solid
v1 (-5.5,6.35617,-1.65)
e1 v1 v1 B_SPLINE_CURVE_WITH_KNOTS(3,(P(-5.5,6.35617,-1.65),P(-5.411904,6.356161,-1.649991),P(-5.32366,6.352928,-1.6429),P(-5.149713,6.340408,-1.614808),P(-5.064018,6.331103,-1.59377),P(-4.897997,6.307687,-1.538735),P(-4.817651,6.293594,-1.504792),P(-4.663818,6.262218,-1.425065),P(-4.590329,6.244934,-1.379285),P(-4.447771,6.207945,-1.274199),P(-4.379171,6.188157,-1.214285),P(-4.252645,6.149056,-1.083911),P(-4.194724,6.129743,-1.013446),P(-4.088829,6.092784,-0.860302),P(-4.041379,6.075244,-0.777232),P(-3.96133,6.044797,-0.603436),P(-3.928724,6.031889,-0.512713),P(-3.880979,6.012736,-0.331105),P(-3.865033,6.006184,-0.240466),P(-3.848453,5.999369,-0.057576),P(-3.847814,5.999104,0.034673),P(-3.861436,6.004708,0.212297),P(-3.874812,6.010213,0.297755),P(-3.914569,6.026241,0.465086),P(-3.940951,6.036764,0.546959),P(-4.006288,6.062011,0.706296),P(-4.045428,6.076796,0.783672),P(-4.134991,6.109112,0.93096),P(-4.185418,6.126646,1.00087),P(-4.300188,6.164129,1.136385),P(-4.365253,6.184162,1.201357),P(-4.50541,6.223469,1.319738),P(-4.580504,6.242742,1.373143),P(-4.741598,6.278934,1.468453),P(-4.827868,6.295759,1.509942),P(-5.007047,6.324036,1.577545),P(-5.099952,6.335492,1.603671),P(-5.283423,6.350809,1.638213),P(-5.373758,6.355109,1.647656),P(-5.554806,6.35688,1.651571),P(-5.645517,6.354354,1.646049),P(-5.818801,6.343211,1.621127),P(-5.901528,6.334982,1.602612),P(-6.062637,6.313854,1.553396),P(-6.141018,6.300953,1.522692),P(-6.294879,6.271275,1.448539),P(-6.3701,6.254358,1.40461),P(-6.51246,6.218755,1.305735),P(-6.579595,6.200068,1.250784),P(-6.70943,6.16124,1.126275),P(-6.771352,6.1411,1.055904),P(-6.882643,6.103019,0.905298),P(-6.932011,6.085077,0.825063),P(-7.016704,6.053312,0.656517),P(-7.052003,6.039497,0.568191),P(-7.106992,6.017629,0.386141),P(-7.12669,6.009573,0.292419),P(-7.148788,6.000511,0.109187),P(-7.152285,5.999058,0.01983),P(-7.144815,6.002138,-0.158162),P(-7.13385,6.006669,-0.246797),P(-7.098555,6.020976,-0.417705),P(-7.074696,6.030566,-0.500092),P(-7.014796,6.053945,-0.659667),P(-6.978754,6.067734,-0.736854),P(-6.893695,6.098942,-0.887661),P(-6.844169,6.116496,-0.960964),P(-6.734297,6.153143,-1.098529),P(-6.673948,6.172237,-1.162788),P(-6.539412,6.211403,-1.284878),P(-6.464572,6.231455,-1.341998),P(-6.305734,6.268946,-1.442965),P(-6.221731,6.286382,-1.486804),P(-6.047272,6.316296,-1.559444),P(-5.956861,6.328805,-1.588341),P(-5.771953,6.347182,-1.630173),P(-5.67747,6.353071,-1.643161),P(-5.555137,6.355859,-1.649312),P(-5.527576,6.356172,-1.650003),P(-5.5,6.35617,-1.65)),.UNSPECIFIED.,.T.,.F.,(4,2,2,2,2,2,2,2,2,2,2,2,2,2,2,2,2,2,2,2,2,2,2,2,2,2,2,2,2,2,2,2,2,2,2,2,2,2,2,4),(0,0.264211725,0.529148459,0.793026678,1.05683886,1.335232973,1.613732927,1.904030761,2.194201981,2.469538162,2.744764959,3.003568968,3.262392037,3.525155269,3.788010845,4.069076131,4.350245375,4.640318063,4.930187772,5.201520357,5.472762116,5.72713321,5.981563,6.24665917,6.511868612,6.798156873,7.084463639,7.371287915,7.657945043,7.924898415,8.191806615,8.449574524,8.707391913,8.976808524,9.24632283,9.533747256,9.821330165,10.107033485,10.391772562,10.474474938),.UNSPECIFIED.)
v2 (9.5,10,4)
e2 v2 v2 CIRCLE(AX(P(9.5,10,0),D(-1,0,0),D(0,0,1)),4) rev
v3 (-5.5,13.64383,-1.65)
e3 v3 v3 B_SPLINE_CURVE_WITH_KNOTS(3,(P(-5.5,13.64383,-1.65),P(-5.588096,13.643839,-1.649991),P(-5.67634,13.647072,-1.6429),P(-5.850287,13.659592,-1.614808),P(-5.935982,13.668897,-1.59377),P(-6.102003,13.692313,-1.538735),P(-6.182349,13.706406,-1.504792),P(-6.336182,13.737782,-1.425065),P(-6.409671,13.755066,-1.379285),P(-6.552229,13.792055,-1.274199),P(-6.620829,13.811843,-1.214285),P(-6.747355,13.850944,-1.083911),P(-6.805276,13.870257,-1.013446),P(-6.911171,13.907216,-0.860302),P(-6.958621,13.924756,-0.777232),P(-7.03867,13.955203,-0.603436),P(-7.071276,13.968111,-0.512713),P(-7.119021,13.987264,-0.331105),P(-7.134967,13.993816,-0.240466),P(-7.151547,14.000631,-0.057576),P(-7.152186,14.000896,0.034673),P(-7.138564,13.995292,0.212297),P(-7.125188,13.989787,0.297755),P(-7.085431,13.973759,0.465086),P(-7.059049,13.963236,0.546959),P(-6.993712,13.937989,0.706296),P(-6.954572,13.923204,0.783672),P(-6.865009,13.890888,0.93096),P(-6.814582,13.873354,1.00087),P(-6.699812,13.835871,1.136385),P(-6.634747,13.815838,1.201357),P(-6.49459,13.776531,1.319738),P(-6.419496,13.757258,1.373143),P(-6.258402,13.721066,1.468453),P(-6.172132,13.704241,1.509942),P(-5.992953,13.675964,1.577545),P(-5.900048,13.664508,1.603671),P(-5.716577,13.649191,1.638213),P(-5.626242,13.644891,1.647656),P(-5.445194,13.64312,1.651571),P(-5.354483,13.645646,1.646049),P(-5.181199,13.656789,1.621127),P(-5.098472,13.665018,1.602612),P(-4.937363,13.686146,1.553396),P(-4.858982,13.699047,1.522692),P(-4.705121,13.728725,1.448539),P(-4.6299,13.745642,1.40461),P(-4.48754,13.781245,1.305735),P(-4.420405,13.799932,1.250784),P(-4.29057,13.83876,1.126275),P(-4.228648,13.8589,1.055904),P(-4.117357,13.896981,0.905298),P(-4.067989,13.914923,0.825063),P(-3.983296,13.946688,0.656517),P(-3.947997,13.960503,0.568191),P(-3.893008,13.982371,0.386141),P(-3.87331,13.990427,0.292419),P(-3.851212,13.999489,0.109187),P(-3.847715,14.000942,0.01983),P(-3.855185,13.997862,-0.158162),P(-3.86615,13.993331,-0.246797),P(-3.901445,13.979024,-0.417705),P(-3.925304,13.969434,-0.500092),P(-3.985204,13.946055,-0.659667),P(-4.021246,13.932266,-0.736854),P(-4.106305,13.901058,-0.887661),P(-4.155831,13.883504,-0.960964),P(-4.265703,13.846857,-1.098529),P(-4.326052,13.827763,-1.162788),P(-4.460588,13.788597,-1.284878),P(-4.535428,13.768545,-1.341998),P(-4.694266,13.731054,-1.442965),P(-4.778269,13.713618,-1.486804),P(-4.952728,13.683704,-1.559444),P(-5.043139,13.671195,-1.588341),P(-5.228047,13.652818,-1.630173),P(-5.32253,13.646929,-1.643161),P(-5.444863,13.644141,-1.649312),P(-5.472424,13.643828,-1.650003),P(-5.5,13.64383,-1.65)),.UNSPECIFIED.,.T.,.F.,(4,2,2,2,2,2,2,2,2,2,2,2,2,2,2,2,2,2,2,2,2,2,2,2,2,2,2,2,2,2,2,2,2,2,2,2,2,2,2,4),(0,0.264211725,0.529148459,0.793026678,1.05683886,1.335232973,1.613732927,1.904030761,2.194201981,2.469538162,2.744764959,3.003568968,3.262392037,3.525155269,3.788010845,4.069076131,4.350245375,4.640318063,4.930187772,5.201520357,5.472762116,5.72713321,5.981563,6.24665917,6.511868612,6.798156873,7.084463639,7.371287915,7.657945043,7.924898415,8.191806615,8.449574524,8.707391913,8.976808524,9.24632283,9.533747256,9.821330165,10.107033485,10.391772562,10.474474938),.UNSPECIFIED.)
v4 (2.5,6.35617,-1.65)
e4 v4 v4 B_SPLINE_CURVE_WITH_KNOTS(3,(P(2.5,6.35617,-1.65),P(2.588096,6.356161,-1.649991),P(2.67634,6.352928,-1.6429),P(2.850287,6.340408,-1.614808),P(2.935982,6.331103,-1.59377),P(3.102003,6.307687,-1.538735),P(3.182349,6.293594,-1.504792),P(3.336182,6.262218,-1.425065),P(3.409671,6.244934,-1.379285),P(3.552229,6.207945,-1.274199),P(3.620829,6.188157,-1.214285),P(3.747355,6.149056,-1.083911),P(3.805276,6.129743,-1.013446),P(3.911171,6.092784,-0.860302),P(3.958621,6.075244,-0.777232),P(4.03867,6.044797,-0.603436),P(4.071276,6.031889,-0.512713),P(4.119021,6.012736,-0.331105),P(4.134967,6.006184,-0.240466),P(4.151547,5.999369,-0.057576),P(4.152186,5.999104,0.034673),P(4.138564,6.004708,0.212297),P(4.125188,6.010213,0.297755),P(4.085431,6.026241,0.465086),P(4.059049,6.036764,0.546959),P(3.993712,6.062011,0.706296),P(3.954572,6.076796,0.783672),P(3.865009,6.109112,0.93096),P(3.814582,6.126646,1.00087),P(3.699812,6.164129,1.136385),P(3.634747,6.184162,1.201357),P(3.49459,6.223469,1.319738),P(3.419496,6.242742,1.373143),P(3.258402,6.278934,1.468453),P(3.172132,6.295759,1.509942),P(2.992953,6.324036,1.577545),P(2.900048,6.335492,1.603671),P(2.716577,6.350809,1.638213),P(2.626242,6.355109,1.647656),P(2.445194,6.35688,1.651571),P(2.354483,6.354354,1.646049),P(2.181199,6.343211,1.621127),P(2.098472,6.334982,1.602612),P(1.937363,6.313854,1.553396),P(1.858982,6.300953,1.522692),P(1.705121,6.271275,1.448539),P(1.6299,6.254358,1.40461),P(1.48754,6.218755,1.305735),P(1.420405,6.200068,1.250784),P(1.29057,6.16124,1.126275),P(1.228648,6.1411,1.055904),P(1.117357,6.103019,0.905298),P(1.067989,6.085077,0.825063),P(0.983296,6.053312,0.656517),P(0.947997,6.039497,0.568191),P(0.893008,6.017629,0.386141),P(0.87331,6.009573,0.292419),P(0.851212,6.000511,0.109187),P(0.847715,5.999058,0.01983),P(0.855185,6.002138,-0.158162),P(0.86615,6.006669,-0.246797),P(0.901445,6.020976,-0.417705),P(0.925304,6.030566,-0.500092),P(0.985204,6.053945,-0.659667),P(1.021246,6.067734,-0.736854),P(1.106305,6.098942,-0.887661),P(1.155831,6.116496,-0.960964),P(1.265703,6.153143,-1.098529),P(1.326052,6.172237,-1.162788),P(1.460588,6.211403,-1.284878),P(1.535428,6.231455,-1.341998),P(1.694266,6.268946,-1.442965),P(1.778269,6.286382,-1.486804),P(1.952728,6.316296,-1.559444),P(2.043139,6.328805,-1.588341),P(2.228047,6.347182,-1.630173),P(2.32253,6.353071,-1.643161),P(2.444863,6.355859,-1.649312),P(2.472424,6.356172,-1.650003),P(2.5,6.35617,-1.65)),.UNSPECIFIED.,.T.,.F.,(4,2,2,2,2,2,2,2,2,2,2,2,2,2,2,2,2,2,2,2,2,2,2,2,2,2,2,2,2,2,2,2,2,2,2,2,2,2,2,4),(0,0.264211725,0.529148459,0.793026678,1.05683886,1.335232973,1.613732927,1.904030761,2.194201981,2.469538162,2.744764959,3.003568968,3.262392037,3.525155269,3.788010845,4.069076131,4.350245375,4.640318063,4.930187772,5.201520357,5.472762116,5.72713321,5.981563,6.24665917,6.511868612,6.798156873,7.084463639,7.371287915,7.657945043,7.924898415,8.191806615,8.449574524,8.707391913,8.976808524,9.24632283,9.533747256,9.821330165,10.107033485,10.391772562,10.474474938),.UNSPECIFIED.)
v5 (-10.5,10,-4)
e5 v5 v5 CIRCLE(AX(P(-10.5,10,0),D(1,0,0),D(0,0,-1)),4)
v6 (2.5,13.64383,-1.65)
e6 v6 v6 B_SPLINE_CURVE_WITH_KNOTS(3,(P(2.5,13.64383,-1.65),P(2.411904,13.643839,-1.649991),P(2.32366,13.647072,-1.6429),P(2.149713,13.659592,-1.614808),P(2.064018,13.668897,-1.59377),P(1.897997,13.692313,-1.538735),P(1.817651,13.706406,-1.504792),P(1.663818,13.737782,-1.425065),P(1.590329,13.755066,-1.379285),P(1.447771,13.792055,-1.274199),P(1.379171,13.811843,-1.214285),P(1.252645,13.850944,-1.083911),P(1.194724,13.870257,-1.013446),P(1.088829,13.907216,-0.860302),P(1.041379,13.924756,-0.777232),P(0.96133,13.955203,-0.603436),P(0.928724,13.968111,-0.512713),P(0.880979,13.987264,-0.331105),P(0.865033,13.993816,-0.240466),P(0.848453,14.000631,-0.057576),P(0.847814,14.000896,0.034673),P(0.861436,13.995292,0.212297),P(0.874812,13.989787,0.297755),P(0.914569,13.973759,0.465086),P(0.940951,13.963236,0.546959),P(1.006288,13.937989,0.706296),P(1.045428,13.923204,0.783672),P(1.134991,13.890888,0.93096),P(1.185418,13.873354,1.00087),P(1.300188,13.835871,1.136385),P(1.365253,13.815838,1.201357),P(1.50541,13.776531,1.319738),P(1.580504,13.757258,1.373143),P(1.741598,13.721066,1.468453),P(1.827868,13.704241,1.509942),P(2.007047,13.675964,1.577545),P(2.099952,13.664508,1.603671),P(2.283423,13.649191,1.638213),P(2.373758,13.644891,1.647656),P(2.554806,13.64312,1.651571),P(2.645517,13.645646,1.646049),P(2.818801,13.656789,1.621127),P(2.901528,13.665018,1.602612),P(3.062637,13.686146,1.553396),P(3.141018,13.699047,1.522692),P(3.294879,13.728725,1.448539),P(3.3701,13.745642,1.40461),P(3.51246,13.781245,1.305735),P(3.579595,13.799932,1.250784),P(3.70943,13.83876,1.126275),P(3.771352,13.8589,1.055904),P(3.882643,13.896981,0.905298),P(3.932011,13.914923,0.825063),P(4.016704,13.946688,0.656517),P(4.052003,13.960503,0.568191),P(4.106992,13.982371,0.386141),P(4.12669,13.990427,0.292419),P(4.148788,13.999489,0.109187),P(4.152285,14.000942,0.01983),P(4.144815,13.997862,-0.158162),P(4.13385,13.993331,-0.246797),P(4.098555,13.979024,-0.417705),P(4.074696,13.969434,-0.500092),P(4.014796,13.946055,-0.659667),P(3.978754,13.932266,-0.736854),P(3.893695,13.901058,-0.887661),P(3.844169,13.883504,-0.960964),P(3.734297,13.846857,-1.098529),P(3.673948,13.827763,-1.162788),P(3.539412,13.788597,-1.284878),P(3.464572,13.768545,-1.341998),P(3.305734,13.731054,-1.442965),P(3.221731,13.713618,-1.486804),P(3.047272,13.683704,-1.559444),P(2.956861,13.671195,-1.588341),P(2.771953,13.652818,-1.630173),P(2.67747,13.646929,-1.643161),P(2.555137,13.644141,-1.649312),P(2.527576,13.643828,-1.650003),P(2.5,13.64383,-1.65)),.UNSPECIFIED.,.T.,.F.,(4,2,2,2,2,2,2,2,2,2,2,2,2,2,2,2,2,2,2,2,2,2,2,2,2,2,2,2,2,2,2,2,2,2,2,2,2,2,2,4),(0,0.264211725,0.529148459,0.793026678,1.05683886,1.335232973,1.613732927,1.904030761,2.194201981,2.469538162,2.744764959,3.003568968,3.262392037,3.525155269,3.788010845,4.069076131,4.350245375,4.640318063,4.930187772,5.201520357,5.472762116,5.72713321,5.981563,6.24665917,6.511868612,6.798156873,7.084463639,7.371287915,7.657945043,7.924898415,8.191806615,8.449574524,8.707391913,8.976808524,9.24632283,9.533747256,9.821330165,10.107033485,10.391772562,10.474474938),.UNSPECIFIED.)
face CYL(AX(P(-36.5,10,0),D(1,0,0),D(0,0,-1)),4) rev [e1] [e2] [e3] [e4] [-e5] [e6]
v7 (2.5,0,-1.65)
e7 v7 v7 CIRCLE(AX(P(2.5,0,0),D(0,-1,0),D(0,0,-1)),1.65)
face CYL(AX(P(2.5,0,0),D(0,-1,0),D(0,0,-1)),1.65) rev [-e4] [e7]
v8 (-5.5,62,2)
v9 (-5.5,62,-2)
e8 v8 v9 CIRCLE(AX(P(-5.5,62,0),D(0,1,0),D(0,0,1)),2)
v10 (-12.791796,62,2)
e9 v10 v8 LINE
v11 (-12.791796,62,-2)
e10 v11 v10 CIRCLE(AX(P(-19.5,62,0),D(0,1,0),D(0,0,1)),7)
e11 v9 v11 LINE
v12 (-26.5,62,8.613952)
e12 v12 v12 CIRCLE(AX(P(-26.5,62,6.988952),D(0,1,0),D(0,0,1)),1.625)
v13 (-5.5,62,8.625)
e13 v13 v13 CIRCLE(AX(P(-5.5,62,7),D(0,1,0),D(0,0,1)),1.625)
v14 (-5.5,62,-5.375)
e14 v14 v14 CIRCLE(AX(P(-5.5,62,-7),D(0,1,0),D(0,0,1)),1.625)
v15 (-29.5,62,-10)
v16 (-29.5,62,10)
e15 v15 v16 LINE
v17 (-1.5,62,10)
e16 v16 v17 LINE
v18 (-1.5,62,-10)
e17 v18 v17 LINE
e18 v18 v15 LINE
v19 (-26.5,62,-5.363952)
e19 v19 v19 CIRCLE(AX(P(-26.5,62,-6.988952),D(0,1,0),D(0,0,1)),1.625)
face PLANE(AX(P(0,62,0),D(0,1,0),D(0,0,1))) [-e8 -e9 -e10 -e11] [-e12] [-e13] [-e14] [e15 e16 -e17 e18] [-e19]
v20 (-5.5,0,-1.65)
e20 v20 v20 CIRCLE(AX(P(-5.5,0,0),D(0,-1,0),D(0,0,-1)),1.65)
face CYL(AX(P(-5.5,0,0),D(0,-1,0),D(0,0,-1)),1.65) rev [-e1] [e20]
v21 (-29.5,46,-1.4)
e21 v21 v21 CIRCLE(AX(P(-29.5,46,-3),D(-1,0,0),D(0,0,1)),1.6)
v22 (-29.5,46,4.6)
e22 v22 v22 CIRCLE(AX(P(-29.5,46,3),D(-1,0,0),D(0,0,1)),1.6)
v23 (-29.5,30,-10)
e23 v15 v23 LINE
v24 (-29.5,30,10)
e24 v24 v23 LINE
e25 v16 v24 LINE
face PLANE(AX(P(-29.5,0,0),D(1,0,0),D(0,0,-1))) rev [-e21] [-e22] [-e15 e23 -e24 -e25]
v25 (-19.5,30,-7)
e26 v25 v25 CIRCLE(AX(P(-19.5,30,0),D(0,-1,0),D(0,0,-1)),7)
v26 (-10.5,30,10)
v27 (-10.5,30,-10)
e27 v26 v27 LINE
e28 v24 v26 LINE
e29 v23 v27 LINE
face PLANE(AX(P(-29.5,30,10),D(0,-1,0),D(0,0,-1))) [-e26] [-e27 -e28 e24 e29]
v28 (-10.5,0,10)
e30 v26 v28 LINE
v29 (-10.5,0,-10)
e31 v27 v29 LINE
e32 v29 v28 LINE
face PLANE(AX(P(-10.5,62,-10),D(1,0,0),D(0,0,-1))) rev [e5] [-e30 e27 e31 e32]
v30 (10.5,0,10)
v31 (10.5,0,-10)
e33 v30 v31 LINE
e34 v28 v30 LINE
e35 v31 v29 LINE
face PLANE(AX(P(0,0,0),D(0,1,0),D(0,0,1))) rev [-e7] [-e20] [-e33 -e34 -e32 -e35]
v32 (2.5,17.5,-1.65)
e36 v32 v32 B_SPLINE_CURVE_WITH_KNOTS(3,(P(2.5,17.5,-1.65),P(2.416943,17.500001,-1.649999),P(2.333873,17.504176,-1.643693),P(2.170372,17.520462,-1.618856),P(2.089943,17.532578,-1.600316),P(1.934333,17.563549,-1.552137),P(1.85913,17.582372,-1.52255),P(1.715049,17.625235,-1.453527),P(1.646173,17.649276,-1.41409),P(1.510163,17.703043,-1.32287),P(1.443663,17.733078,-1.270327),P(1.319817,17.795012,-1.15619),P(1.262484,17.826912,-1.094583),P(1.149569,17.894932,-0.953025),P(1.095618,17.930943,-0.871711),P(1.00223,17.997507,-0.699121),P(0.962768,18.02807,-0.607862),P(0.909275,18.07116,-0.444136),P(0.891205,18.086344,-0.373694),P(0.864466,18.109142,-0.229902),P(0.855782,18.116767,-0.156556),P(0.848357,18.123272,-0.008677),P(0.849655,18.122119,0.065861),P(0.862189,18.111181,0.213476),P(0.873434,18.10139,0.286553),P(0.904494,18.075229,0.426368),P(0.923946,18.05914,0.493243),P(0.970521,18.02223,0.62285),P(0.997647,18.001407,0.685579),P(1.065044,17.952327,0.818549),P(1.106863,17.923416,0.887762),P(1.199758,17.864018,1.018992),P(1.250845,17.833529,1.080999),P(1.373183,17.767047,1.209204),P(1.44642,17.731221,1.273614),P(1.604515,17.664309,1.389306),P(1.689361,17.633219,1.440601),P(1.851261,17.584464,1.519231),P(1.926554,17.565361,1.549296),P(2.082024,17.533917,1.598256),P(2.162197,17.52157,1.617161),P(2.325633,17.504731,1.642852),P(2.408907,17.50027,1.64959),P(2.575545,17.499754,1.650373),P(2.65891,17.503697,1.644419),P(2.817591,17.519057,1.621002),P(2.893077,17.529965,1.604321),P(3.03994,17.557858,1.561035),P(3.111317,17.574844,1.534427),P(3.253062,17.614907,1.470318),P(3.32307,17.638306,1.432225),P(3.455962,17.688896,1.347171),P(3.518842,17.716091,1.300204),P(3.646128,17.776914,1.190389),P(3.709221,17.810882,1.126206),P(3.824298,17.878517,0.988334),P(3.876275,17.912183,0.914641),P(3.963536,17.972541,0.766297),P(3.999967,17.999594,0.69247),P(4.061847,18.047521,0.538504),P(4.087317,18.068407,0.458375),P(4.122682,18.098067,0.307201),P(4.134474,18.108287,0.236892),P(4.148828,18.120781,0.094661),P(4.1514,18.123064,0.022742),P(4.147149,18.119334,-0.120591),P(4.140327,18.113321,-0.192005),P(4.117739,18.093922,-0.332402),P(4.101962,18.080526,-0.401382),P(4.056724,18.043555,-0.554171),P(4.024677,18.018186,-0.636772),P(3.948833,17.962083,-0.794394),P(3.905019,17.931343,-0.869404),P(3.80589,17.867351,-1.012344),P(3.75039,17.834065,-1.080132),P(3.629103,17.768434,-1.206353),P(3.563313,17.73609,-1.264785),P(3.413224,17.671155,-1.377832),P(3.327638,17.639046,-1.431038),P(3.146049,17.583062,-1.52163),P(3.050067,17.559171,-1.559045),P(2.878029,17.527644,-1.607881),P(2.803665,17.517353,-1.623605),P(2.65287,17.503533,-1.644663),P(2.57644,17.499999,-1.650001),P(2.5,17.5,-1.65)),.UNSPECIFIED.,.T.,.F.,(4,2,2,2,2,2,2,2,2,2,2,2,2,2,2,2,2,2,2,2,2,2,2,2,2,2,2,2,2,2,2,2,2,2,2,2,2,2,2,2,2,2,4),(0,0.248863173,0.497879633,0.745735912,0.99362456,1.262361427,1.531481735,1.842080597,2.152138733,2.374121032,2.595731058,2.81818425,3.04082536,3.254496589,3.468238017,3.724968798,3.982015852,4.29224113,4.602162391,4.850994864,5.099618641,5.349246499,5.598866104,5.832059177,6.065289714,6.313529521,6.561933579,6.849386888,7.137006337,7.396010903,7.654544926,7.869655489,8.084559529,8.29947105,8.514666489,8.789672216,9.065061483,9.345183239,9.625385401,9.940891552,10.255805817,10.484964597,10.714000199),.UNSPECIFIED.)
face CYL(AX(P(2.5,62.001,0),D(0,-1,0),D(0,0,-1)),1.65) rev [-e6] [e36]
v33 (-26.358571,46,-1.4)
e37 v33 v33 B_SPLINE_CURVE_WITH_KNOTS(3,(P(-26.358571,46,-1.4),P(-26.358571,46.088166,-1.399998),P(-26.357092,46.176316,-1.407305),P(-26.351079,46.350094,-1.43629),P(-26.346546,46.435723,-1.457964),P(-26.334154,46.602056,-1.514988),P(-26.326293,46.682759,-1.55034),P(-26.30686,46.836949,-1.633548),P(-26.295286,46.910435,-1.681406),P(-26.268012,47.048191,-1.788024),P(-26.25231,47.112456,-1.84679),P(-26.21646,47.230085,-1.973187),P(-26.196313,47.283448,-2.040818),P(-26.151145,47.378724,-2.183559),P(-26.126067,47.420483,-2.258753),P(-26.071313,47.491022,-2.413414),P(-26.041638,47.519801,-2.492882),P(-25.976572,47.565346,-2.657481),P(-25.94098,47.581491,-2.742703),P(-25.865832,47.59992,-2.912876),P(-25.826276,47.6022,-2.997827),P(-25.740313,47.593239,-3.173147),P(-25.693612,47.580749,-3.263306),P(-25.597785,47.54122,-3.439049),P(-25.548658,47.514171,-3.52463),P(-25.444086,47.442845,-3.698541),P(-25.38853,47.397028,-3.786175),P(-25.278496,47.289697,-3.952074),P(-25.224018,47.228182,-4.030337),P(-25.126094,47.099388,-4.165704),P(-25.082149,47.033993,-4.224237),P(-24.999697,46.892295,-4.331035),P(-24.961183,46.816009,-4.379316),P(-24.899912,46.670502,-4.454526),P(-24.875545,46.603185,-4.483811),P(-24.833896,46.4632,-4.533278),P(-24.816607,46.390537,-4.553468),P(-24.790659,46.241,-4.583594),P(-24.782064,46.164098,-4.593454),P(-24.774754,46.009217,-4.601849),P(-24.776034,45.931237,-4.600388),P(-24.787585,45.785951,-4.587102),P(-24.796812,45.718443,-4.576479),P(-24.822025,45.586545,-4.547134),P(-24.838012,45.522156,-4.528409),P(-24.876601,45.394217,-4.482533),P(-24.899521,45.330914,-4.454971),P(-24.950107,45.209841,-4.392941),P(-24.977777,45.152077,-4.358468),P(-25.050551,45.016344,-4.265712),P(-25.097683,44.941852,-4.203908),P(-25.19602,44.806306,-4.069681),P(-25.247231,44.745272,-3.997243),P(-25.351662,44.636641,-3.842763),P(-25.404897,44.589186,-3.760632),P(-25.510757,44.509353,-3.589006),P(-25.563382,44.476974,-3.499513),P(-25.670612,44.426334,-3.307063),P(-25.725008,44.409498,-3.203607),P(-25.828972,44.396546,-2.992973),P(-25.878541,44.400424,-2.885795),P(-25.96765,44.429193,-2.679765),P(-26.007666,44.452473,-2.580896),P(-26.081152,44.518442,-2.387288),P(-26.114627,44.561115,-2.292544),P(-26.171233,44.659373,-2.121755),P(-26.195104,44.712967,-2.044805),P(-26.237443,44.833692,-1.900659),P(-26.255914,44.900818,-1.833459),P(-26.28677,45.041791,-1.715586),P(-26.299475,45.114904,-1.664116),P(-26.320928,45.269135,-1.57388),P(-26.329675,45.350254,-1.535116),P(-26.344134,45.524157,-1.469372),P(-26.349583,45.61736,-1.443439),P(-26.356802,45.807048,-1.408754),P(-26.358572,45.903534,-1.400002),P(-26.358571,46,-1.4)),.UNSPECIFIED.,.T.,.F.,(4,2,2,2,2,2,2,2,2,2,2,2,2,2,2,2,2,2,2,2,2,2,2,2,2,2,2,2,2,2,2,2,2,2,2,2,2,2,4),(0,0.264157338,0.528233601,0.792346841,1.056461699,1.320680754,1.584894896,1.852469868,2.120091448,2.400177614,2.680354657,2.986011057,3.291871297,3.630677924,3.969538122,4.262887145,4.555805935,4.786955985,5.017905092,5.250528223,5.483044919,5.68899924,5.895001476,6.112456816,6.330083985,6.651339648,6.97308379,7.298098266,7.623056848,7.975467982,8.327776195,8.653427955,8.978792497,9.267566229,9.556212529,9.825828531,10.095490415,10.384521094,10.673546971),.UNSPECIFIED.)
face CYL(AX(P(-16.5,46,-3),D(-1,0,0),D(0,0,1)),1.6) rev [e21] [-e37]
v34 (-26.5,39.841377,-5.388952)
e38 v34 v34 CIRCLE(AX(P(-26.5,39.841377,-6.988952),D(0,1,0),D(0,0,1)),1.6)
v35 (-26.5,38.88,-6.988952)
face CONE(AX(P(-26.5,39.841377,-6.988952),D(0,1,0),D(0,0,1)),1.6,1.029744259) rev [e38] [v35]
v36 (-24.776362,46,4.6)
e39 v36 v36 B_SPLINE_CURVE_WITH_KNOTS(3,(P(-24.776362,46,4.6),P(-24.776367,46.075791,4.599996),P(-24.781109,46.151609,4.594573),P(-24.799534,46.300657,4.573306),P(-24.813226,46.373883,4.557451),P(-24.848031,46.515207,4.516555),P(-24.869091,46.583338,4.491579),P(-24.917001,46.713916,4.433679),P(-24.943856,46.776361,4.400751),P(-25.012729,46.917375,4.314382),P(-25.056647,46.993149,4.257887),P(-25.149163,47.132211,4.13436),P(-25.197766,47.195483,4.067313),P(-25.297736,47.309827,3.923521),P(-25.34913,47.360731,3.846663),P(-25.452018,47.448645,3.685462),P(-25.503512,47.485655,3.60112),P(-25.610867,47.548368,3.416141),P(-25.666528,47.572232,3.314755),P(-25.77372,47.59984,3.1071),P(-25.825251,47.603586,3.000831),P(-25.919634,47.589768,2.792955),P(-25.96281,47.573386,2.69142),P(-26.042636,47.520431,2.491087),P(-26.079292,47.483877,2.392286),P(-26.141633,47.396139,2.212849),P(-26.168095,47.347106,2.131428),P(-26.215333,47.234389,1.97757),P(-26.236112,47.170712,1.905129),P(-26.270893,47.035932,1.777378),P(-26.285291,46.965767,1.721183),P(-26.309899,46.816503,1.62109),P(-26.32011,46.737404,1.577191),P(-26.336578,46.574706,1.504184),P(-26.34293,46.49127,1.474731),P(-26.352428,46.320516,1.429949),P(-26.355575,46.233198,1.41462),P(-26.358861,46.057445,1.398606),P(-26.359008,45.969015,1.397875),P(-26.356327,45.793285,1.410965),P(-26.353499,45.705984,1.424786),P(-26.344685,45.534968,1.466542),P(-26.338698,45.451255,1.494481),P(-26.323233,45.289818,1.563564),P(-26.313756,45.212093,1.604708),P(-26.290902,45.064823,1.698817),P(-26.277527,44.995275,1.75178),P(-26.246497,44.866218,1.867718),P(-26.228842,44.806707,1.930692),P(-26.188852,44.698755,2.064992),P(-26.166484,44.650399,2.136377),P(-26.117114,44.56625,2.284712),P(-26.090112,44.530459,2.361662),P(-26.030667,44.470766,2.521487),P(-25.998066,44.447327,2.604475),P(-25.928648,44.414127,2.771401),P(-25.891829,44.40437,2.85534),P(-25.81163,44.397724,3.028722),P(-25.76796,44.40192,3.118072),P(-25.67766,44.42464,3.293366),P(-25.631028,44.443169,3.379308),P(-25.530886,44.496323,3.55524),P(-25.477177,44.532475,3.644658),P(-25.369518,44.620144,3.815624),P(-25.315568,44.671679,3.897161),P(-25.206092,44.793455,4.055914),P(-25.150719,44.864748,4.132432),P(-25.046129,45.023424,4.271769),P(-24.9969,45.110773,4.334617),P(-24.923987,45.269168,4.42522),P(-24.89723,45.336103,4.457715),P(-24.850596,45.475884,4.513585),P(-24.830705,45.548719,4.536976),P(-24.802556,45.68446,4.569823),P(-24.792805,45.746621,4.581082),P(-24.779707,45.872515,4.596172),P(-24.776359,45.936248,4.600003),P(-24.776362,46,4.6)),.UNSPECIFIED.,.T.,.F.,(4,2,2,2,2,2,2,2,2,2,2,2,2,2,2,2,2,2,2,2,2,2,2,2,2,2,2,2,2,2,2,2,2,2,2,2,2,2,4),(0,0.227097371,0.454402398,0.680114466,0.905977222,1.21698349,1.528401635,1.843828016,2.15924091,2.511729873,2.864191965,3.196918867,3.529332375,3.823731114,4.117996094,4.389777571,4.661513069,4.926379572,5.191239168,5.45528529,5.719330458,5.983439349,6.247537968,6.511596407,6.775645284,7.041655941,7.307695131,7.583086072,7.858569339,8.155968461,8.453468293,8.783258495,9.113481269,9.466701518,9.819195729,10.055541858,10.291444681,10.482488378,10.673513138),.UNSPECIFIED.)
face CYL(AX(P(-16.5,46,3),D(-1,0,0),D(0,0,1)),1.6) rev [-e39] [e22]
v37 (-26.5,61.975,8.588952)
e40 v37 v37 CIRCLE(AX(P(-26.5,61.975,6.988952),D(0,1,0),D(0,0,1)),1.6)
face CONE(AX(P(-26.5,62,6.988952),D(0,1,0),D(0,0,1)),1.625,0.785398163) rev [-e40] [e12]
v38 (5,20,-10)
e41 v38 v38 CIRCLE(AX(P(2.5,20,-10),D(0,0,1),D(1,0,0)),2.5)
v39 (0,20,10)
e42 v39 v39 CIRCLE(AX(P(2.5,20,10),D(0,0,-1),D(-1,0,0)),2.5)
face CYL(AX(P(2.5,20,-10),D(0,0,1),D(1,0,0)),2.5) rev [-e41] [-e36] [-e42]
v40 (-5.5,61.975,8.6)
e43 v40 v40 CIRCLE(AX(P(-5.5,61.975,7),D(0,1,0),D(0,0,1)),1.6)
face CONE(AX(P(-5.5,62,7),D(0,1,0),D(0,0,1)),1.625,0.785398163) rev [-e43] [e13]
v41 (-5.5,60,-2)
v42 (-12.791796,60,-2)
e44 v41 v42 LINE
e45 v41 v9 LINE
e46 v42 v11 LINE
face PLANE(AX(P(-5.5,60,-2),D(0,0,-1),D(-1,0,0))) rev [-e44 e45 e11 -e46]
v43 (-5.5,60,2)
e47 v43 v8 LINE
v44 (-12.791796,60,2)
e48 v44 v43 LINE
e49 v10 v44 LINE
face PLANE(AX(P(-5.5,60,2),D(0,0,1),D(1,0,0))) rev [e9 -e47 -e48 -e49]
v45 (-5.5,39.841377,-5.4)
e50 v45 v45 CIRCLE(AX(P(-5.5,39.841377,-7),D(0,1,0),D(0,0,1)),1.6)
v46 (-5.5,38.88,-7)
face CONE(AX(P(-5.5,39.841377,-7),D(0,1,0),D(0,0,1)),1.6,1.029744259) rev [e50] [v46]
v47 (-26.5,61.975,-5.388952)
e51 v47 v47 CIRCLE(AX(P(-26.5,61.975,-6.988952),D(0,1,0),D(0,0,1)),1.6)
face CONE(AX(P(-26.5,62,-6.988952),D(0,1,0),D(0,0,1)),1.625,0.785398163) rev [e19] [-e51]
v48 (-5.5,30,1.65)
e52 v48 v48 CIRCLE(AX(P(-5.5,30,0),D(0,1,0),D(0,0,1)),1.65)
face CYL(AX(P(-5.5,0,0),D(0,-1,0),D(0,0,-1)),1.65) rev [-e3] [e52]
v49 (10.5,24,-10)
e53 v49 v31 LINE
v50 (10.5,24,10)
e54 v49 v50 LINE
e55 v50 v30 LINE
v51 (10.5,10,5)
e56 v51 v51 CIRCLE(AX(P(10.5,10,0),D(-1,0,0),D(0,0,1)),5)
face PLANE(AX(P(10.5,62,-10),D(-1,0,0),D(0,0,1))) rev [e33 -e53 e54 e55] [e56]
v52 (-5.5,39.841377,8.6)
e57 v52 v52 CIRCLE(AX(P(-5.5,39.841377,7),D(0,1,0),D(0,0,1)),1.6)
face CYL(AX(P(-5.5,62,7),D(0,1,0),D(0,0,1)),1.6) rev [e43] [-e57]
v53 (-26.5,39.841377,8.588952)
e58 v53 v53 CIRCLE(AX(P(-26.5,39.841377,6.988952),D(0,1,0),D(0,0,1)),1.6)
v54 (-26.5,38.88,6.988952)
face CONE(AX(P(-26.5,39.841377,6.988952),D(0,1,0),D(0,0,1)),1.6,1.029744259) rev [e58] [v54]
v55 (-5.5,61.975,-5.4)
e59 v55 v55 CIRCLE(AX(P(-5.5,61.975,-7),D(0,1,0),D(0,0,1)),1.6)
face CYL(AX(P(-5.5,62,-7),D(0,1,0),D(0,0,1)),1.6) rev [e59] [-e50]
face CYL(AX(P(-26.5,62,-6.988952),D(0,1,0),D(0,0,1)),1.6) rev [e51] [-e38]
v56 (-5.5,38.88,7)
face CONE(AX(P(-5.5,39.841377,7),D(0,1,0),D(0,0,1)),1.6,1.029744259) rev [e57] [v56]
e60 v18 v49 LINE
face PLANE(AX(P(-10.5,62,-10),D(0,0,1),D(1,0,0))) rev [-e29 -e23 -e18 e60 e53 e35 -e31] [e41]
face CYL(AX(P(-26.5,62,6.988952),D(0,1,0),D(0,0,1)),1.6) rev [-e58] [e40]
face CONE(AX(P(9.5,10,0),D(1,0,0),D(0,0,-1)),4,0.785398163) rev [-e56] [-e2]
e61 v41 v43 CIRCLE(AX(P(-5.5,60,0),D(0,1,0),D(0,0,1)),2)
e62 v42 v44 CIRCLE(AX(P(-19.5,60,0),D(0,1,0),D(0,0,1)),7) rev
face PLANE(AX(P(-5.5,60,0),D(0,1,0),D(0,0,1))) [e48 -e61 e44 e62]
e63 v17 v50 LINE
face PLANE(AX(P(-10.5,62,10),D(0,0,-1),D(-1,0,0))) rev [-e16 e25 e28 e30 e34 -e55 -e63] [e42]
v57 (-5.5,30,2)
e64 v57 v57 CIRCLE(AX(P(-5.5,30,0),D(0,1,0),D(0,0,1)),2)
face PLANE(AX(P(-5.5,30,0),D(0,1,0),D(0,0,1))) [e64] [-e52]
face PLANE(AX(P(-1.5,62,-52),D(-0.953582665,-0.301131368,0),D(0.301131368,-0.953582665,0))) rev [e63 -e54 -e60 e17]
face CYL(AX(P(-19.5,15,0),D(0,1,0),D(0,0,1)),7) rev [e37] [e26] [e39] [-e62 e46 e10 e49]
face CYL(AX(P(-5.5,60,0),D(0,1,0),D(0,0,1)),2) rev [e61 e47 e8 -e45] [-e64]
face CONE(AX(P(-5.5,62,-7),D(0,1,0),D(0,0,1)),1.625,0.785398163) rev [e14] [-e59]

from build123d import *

# Parameters (mm, degrees)
SKETCH1_W                      = 21
SKETCH1_H                      = 20
BOSS_EXTRUDE2_DEPTH            = 62
CUT_EXTRUDE1_DEPTH             = 62
SKETCH4_W                      = 20
SKETCH4_H                      = 32
BOSS_EXTRUDE3_DEPTH            = 19
SKETCH7_R                      = 7
CUT_EXTRUDE2_DEPTH             = 47
SKETCH8_R                      = 4
CUT_EXTRUDE3_DEPTH             = 47
M3_CLEARANCE_HOLE1_D           = 3.2
M3_CLEARANCE_HOLE1_DEPTH       = 22.15862301
M3_CLEARANCE_HOLE1_CSINK_D     = 3.25
M3_CLEARANCE_HOLE1_CSINK_ANGLE = 90
M3_CLEARANCE_HOLE1_TIP         = 0.96137699
CUT_EXTRUDE7_DEPTH             = 72.513984646
CUT_EXTRUDE7_DEPTH_BACK        = 72.513984646
SKETCH14_R                     = 2.5
CHAMFER1_SIZE                  = 1
CUT_EXTRUDE8_DEPTH             = 2
HOLE1_D                        = 2.5
HOLE1_DEPTH                    = 100
SKETCH18_R                     = 2
CUT_EXTRUDE10_DEPTH            = 30
SKETCH19_R                     = 1.6
CUT_EXTRUDE11_DEPTH            = 13
CUT_EXTRUDE12_REACH            = 71.385
CUT_EXTRUDE12_END_RADIUS       = 2.5
SKETCH24_R                     = 1.65


with BuildPart() as part:
    # Sketch1 → Boss-Extrude2 (new body)
    with BuildSketch(Plane(origin=(0, 0, 0), x_dir=(1, 0, 0), z_dir=(0, 1, 0))):
        Rectangle(SKETCH1_W, SKETCH1_H)
    extrude(amount=BOSS_EXTRUDE2_DEPTH)

    # Sketch3 → Cut-Extrude1 (cut)
    with BuildSketch(Plane.XY.offset(10)):
        Polygon((10.5, 62), (-1.5, 62), (10.5, 24), align=None)
    extrude(amount=-CUT_EXTRUDE1_DEPTH, mode=Mode.SUBTRACT)

    # Sketch4 → Boss-Extrude3 (add)
    with BuildSketch(Plane.ZY.offset(10.5)):
        with Locations((0, 46)):
            Rectangle(SKETCH4_W, SKETCH4_H)
    extrude(amount=BOSS_EXTRUDE3_DEPTH)

    # Sketch7 → Cut-Extrude2 (cut)
    with BuildSketch(Plane(origin=(0, 62, 0), x_dir=(1, 0, 0), z_dir=(0, 1, 0))):
        with Locations(Location((-19.5, 0, 0), (0, 0, 270))):
            Circle(SKETCH7_R)
    extrude(amount=-CUT_EXTRUDE2_DEPTH, mode=Mode.SUBTRACT)

    # Sketch8 → Cut-Extrude3 (cut)
    with BuildSketch(Plane(origin=(10.5, 0, 0), x_dir=(0, 0, -1), z_dir=(1, 0, 0))):
        with Locations((0, 10)):
            Circle(SKETCH8_R)
    extrude(amount=-CUT_EXTRUDE3_DEPTH, mode=Mode.SUBTRACT)

    # M3 Clearance Hole1
    with Locations(Plane(origin=(0, 62, 0), x_dir=(1, 0, 0), z_dir=(0, 1, 0))):
        with Locations((-26.5, 6.988952109), (-26.5, -6.988952109), (-5.5, -7), (-5.5, 7)):
            CounterSinkHole(M3_CLEARANCE_HOLE1_D / 2, M3_CLEARANCE_HOLE1_CSINK_D / 2, depth=M3_CLEARANCE_HOLE1_DEPTH, counter_sink_angle=M3_CLEARANCE_HOLE1_CSINK_ANGLE)
            with Locations((0, 0, -(M3_CLEARANCE_HOLE1_DEPTH + M3_CLEARANCE_HOLE1_TIP / 2))):  # 118° drill point
                Cone(0, M3_CLEARANCE_HOLE1_D / 2, M3_CLEARANCE_HOLE1_TIP, mode=Mode.SUBTRACT)

    # Sketch14 → Cut-Extrude7 (cut, two sides: drawn at the far end of the back side and taken through both)
    with BuildSketch(Plane.XY.offset(10).offset(-CUT_EXTRUDE7_DEPTH_BACK)):
        with Locations((2.5, 20)):
            Circle(SKETCH14_R)
    extrude(amount=CUT_EXTRUDE7_DEPTH + CUT_EXTRUDE7_DEPTH_BACK, mode=Mode.SUBTRACT)

    # Chamfer1
    chamfer1_edges = [part.edges().sort_by_distance(p)[0] for p in [
        (10.5, 10, 4),
    ]]
    chamfer(chamfer1_edges, length=CHAMFER1_SIZE)

    # Sketch15 → Cut-Extrude8 (cut)
    with BuildSketch(Plane(origin=(0, 62, 0), x_dir=(1, 0, 0), z_dir=(0, 1, 0))):
        with BuildLine():
            Line((-5.5, 2), (-14.947436463, 2))
            Line((-14.947436463, 2), (-14.947436463, -2))
            Line((-14.947436463, -2), (-5.5, -2))
            ThreePointArc((-5.5, -2), (-3.5, 0), (-5.5, 2))
        make_face()
    extrude(amount=-CUT_EXTRUDE8_DEPTH, mode=Mode.SUBTRACT)

    # Hole1
    with Locations(Plane(origin=(0, 60, 0), x_dir=(1, 0, 0), z_dir=(0, 1, 0))):
        with Locations((-5.231662338, 0)):
            Hole(HOLE1_D / 2, depth=HOLE1_DEPTH)

    # Sketch18 → Cut-Extrude10 (cut)
    with BuildSketch(Plane(origin=(0, 60, 0), x_dir=(1, 0, 0), z_dir=(0, 1, 0))):
        with Locations(Location((-5.5, 0, 0), (0, 0, 270))):
            Circle(SKETCH18_R)
    extrude(amount=-CUT_EXTRUDE10_DEPTH, mode=Mode.SUBTRACT)

    # Sketch19 → Cut-Extrude11 (cut)
    with BuildSketch(Plane.ZY.offset(29.5)):
        with Locations((-3, 46)):
            Circle(SKETCH19_R)
        with Locations((3, 46)):
            Circle(SKETCH19_R)
    extrude(amount=-CUT_EXTRUDE11_DEPTH, mode=Mode.SUBTRACT)

    # M4 Tapped Hole1: read off the stored shape, not the designer's step
    # M4 Tapped Hole1: loft between two sections, ruled curve by curve
    m4_tapped_hole1_from = [
        Edge.make_three_point_arc((-5.5, 6.356330866, -1.65), (-3.85, 6.356330866, 0), (-5.5, 6.356330866, 1.65)),
        Edge.make_three_point_arc((-5.5, 6.356330866, 1.65), (-7.15, 6.356330866, 0), (-5.5, 6.356330866, -1.65)),
    ]
    m4_tapped_hole1_to = [
        Edge.make_three_point_arc((-5.5, 0, -1.65), (-3.85, 0, 0), (-5.5, 0, 1.65)),
        Edge.make_three_point_arc((-5.5, 0, 1.65), (-7.15, 0, 0), (-5.5, 0, -1.65)),
    ]
    m4_tapped_hole1 = Solid(Shell([*[Face.make_surface_from_curves(m4_tapped_hole1_from[k], m4_tapped_hole1_to[k]) for k in range(2)], Face(Wire(m4_tapped_hole1_from)), Face(Wire(m4_tapped_hole1_to))]))
    add(m4_tapped_hole1, mode=Mode.SUBTRACT)

    # M4 Tapped Hole1 2: loft between two sections, ruled curve by curve
    m4_tapped_hole1_2_from = [
        Edge.make_three_point_arc((-5.5, 30, -1.65), (-3.85, 30, 0), (-5.5, 30, 1.65)),
        Edge.make_three_point_arc((-5.5, 30, 1.65), (-7.15, 30, 0), (-5.5, 30, -1.65)),
    ]
    m4_tapped_hole1_2_to = [
        Edge.make_three_point_arc((-5.5, 13.643669134, -1.65), (-3.85, 13.643669134, 0), (-5.5, 13.643669134, 1.65)),
        Edge.make_three_point_arc((-5.5, 13.643669134, 1.65), (-7.15, 13.643669134, 0), (-5.5, 13.643669134, -1.65)),
    ]
    m4_tapped_hole1_2 = Solid(Shell([*[Face.make_surface_from_curves(m4_tapped_hole1_2_from[k], m4_tapped_hole1_2_to[k]) for k in range(2)], Face(Wire(m4_tapped_hole1_2_from)), Face(Wire(m4_tapped_hole1_2_to))]))
    add(m4_tapped_hole1_2, mode=Mode.SUBTRACT)

    # M4 Tapped Hole1 3: loft between two sections, ruled curve by curve
    m4_tapped_hole1_3_from = [
        Edge.make_three_point_arc((2.5, 6.356330866, -1.65), (4.15, 6.356330866, 0), (2.5, 6.356330866, 1.65)),
        Edge.make_three_point_arc((2.5, 6.356330866, 1.65), (0.85, 6.356330866, 0), (2.5, 6.356330866, -1.65)),
    ]
    m4_tapped_hole1_3_to = [
        Edge.make_three_point_arc((2.5, 0, -1.65), (4.15, 0, 0), (2.5, 0, 1.65)),
        Edge.make_three_point_arc((2.5, 0, 1.65), (0.85, 0, 0), (2.5, 0, -1.65)),
    ]
    m4_tapped_hole1_3 = Solid(Shell([*[Face.make_surface_from_curves(m4_tapped_hole1_3_from[k], m4_tapped_hole1_3_to[k]) for k in range(2)], Face(Wire(m4_tapped_hole1_3_from)), Face(Wire(m4_tapped_hole1_3_to))]))
    add(m4_tapped_hole1_3, mode=Mode.SUBTRACT)

    # Cut-Extrude12: up to this cylinder (the profile starts outside it)
    cut_extrude12_end = Plane(origin=(2.5, 20, 0), z_dir=(0, 0, 1)) * Cylinder(CUT_EXTRUDE12_END_RADIUS, 148.77, mode=Mode.PRIVATE)
    # Sketch24 → Cut-Extrude12 (cut, up to the surface)
    with BuildSketch(Plane.XZ, mode=Mode.PRIVATE) as cut_extrude12_sk1:
        with Locations(Location((2.5, 0, 0), (0, 0, 270))):
            Circle(SKETCH24_R)
    cut_extrude12_tool1 = extrude(cut_extrude12_sk1.sketch, amount=-CUT_EXTRUDE12_REACH, mode=Mode.PRIVATE) - cut_extrude12_end
    add(cut_extrude12_tool1.solids().sort_by_distance((2.5, 0, 0))[0], mode=Mode.SUBTRACT)


solid = part.part
